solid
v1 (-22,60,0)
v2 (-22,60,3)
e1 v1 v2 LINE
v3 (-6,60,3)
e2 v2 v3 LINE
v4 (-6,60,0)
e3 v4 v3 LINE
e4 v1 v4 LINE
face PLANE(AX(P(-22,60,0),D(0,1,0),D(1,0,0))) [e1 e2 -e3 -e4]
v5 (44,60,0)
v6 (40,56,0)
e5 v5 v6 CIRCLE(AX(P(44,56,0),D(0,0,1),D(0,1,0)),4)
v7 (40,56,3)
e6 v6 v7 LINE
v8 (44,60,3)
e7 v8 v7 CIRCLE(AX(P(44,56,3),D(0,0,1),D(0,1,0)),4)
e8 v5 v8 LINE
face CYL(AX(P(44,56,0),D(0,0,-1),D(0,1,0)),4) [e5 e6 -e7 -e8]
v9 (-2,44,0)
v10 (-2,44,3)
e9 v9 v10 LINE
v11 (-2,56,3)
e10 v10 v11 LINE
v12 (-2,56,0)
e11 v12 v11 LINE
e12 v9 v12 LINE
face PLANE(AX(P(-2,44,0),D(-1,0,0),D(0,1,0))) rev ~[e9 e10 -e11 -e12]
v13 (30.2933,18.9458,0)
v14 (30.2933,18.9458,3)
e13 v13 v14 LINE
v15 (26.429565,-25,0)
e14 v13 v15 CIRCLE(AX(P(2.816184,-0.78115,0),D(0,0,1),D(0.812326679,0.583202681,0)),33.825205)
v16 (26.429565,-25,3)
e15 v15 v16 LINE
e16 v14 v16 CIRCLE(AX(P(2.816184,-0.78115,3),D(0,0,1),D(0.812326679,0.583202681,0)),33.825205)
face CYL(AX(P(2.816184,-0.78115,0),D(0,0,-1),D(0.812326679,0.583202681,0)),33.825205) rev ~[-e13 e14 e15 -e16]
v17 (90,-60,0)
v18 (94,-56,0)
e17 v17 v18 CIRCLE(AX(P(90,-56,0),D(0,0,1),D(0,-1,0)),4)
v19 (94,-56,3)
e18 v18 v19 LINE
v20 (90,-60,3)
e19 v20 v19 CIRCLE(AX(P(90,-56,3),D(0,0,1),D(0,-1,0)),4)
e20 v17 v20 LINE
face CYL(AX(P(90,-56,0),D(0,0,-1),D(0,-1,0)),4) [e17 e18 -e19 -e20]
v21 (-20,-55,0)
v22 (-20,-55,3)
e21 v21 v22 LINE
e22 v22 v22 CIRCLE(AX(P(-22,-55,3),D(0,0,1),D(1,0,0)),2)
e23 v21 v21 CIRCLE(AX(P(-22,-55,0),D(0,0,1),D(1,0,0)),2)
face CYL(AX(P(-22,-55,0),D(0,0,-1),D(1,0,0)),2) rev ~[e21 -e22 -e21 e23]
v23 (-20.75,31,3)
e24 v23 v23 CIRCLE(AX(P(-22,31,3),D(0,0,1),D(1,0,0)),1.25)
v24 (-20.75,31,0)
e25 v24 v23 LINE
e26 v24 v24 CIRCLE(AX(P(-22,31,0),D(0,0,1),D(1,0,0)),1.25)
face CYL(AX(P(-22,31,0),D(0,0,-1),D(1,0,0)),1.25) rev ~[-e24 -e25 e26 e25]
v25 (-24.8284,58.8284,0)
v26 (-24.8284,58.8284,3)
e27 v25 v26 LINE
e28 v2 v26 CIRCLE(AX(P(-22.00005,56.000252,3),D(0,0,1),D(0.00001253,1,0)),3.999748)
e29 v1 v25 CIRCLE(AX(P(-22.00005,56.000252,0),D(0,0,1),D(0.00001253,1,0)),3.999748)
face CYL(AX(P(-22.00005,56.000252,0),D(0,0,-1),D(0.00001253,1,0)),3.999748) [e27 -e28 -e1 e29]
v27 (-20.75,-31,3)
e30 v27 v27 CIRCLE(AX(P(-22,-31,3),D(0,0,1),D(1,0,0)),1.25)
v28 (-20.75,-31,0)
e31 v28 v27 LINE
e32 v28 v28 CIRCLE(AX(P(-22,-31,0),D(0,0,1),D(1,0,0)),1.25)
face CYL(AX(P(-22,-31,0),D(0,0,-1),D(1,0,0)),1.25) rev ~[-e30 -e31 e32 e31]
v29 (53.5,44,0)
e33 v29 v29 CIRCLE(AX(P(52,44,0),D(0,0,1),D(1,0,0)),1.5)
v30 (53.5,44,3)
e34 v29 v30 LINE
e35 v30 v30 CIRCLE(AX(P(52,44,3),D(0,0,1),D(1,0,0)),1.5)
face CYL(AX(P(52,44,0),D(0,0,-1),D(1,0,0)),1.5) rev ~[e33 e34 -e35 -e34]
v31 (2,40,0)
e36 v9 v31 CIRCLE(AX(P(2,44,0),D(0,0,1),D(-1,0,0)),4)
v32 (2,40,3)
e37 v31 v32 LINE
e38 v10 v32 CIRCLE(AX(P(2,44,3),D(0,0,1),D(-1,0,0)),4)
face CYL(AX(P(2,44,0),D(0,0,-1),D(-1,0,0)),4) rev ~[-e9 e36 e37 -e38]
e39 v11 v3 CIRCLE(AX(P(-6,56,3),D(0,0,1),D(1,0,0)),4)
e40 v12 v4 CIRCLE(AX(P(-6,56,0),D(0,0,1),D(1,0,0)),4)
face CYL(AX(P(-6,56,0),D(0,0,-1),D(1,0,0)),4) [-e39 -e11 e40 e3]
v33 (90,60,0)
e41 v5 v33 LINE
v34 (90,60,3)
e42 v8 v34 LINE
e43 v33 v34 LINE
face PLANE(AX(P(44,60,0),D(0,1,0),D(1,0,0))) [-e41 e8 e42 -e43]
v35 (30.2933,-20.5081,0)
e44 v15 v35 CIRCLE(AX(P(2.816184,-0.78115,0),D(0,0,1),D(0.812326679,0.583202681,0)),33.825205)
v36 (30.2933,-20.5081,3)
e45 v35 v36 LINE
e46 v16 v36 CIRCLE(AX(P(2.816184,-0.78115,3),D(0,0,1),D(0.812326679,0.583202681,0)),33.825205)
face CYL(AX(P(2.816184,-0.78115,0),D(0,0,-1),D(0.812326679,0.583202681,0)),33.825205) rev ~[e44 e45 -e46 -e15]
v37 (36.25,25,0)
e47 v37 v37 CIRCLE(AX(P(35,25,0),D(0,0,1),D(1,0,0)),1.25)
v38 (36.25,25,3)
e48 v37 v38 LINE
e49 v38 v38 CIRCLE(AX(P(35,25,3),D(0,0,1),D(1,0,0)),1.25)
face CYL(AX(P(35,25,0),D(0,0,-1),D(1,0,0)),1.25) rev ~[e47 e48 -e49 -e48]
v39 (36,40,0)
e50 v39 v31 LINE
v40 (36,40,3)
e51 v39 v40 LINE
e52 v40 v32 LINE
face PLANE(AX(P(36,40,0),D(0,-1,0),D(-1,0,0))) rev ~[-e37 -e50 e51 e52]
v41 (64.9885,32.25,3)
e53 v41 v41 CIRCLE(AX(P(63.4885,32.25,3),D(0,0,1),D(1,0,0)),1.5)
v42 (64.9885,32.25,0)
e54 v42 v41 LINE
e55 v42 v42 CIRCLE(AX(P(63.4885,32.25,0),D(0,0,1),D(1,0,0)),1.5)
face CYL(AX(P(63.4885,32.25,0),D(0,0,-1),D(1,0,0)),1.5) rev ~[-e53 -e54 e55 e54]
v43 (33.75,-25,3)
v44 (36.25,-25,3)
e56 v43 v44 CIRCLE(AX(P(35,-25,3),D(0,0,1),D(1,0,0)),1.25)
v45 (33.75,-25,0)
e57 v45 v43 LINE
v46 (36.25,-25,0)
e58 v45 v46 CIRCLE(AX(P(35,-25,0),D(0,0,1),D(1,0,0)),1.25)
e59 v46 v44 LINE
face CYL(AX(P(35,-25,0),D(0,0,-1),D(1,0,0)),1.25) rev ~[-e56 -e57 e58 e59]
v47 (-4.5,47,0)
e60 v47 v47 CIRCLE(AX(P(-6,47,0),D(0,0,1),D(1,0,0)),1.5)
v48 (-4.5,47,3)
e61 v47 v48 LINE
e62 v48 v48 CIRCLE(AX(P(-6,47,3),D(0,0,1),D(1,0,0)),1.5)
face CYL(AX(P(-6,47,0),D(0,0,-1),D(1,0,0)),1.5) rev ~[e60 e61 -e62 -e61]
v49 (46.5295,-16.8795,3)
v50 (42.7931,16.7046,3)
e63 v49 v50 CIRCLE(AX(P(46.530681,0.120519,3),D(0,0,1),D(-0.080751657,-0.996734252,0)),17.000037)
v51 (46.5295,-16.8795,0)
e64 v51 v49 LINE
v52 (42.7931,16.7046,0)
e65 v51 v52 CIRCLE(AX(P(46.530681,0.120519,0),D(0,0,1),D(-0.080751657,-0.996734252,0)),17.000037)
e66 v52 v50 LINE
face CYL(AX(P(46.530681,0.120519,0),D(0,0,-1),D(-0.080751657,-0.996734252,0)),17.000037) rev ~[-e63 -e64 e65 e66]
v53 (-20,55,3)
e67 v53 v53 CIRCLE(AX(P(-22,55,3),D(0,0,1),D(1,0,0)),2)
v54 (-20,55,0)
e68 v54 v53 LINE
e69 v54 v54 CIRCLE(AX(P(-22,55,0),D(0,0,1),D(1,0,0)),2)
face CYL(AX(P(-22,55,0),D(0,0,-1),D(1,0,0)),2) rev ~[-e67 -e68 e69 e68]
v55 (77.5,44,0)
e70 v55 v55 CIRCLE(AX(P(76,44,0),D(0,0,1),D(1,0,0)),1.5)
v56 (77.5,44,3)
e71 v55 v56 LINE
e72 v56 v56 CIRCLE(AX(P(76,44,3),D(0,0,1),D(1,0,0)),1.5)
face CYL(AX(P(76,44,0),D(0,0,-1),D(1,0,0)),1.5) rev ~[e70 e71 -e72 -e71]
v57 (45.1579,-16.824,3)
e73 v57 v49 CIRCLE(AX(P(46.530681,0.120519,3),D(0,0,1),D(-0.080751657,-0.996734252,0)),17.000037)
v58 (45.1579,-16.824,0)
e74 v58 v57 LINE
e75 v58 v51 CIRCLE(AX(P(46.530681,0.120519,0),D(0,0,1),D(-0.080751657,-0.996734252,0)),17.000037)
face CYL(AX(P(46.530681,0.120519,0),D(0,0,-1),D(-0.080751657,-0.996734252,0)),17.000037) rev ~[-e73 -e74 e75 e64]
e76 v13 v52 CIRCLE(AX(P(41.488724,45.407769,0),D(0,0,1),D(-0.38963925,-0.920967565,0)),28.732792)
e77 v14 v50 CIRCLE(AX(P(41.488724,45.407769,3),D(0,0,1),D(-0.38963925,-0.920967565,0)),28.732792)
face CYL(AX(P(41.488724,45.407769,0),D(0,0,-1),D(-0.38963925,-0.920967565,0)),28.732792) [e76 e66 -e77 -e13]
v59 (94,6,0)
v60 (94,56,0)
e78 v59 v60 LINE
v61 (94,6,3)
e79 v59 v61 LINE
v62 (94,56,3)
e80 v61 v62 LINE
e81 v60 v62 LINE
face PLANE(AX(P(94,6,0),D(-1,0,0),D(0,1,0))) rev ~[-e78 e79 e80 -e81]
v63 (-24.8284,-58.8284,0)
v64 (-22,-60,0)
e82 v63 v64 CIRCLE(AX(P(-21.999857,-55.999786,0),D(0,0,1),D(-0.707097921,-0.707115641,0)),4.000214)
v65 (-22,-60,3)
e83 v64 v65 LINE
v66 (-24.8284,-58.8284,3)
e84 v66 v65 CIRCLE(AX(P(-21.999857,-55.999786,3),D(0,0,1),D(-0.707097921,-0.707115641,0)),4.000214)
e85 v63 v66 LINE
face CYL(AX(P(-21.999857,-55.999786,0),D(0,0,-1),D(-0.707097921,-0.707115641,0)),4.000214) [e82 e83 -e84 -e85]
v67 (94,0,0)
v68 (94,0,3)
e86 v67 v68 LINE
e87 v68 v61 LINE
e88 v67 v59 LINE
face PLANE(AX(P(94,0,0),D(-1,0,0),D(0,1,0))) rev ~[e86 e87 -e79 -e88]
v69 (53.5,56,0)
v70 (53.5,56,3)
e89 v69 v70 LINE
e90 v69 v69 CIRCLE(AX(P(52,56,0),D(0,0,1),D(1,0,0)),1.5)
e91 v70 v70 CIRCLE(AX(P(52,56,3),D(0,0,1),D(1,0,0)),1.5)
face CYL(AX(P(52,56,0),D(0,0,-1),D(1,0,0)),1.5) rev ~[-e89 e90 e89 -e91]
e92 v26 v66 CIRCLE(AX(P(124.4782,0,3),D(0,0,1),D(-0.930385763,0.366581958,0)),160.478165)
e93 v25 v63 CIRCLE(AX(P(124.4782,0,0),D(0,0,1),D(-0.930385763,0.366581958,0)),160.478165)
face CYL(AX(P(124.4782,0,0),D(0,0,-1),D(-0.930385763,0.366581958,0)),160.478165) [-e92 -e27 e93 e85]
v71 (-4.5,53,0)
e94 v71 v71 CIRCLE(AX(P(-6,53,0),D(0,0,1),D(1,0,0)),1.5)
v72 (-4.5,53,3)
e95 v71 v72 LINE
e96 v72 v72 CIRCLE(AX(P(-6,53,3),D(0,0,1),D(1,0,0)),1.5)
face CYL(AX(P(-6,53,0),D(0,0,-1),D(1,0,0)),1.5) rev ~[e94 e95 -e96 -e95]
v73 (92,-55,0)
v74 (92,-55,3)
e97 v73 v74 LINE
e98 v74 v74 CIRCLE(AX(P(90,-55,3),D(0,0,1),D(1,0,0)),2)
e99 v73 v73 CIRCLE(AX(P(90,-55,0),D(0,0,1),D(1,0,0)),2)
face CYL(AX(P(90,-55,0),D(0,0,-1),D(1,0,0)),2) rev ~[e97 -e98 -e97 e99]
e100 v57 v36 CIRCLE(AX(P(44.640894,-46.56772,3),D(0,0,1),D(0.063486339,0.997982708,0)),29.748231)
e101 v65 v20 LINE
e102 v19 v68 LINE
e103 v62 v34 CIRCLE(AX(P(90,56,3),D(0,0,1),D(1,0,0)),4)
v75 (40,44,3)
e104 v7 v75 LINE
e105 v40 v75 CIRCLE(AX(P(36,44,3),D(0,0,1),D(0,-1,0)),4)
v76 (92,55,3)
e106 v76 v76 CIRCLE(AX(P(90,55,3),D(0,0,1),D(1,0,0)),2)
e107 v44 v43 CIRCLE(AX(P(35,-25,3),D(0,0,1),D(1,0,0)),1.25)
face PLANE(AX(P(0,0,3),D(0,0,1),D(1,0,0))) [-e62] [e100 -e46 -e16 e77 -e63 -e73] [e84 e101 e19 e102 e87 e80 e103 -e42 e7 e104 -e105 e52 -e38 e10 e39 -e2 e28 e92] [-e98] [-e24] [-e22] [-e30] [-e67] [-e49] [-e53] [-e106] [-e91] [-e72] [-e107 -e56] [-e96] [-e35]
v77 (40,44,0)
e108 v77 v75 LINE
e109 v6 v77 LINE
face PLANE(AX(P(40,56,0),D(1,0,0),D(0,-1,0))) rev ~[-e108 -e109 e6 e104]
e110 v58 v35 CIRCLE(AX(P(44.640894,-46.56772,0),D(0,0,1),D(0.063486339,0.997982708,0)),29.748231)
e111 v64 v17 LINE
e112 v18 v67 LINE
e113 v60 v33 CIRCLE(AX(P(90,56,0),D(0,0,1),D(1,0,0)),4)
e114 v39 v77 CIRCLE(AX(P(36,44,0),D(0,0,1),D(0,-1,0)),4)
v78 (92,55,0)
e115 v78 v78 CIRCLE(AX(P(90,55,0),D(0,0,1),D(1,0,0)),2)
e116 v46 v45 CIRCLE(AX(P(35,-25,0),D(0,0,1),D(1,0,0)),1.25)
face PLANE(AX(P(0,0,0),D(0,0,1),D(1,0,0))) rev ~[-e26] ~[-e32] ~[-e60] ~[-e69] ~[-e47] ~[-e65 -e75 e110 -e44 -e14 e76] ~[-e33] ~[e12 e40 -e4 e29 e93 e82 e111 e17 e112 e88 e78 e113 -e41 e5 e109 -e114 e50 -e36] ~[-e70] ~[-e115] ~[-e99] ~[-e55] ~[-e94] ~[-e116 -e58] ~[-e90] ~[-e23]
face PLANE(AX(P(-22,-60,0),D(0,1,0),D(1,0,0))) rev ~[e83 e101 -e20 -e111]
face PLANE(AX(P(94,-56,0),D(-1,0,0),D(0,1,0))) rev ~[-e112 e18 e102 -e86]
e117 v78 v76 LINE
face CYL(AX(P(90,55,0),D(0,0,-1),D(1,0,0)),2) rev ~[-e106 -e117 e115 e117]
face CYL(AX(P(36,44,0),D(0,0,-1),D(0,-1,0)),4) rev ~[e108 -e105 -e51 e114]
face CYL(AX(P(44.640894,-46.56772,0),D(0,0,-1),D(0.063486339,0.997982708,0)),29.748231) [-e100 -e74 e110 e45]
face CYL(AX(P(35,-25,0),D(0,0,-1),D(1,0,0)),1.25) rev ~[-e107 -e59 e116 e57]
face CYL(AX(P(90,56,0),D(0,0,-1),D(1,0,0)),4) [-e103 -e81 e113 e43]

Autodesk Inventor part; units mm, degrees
ref_plane "YZ Plane" through (0, 0, 0) normal (1, 0, 0) x (0, 1, 0)
ref_plane "XZ Plane" through (0, 0, 0) normal (0, 1, 0) x (-1, 0, 0)
ref_plane "XY Plane" through (0, 0, 0) normal (0, 0, 1) x (1, 0, 0)
sketch "Эскиз1" plane through (0, 0, 0) normal (0, 0, 1) x (1, 0, 0)
  line L0 (0, 29) -> (0, -30)
  circle A0 centre (35, 25) radius 1.25
  circle A1 centre (-22, 31) radius 1.25
  circle A2 centre (-22, -31) radius 1.25
  circle A3 centre (35, -25) radius 1.25
  arc A4 (45.1579, -16.824) -> (42.7931, 16.7046) centre (46.5307, 0.1205) ccw
  line L1 (35, -25) -> (0, -25)
  circle A5 centre (-22, -55) radius 2
  circle A6 centre (90, -55) radius 2
  circle A7 centre (90, 55) radius 2
  circle A8 centre (-22, 55) radius 2
  line L2 (-22, -60) -> (90, -60)
  line L3 (94, -56) -> (94, 56)
  arc A9 (94, 56) -> (90, 60) centre (90, 56) ccw
  arc A10 (90, -60) -> (94, -56) centre (90, -56) ccw
  arc A11 (-24.8284, -58.8284) -> (-22, -60) centre (-22, -56) ccw
  arc A12 (-22, 60) -> (-24.8284, 58.8284) centre (-22, 56) ccw
  line L4 (94, 0) -> (94, 6)
  circle A13 centre (52, 44) radius 1.5
  circle A14 centre (52, 56) radius 1.5
  line L5 (-22, 60) -> (-6, 60)
  line L6 (44, 60) -> (90, 60)
  arc A15 (46.5295, -16.8795) -> (30.2933, -20.5081) centre (44.6409, -46.5678) ccw
  arc A16 (30.2933, 18.9458) -> (42.7931, 16.7046) centre (41.489, 45.4087) ccw
  line L7 (36, 40) -> (2, 40)
  line L8 (-2, 44) -> (-2, 56)
  line L9 (40, 56) -> (40, 44)
  arc A17 (44, 60) -> (40, 56) centre (44, 56) ccw
  arc A18 (36, 40) -> (40, 44) centre (36, 44) ccw
  arc A19 (-2, 44) -> (2, 40) centre (2, 44) ccw
  arc A20 (-2, 56) -> (-6, 60) centre (-6, 56) ccw
  circle A21 centre (-6, 53) radius 1.5
  circle A22 centre (-6, 47) radius 1.5
  arc A23 (-24.8284, 58.8284) -> (-24.8284, -58.8284) centre (124.4782, 0) ccw
  circle A24 centre (63.4885, 32.25) radius 1.5
  circle A25 centre (76, 44) radius 1.5
  arc A26 (30.2933, 18.9458) -> (30.2933, -20.5081) centre (2.8162, -0.7812) ccw
  point P0 (0, 0)
  point P1 (-26, -60)
  point P2 (94, -60)
  dimension "d3" = 2.5
  dimension "d4" = 2.5
  dimension "d5" = 2.5
  dimension "d6" = 2.5
  dimension "d10" = 50
  dimension "d11" = 34
  dimension "d39" = 4
  dimension "d44" = 120
  dimension "d46" = 4
  dimension "d70" = 4
  dimension "d71" = 3
  dimension "d72" = 3
  dimension "d75" = 3
  dimension "d76" = 3
extrude "Выдавливание4" add sketch "Эскиз1" along normal blind 3
properties part number "06-01-Платформа для лидара"
